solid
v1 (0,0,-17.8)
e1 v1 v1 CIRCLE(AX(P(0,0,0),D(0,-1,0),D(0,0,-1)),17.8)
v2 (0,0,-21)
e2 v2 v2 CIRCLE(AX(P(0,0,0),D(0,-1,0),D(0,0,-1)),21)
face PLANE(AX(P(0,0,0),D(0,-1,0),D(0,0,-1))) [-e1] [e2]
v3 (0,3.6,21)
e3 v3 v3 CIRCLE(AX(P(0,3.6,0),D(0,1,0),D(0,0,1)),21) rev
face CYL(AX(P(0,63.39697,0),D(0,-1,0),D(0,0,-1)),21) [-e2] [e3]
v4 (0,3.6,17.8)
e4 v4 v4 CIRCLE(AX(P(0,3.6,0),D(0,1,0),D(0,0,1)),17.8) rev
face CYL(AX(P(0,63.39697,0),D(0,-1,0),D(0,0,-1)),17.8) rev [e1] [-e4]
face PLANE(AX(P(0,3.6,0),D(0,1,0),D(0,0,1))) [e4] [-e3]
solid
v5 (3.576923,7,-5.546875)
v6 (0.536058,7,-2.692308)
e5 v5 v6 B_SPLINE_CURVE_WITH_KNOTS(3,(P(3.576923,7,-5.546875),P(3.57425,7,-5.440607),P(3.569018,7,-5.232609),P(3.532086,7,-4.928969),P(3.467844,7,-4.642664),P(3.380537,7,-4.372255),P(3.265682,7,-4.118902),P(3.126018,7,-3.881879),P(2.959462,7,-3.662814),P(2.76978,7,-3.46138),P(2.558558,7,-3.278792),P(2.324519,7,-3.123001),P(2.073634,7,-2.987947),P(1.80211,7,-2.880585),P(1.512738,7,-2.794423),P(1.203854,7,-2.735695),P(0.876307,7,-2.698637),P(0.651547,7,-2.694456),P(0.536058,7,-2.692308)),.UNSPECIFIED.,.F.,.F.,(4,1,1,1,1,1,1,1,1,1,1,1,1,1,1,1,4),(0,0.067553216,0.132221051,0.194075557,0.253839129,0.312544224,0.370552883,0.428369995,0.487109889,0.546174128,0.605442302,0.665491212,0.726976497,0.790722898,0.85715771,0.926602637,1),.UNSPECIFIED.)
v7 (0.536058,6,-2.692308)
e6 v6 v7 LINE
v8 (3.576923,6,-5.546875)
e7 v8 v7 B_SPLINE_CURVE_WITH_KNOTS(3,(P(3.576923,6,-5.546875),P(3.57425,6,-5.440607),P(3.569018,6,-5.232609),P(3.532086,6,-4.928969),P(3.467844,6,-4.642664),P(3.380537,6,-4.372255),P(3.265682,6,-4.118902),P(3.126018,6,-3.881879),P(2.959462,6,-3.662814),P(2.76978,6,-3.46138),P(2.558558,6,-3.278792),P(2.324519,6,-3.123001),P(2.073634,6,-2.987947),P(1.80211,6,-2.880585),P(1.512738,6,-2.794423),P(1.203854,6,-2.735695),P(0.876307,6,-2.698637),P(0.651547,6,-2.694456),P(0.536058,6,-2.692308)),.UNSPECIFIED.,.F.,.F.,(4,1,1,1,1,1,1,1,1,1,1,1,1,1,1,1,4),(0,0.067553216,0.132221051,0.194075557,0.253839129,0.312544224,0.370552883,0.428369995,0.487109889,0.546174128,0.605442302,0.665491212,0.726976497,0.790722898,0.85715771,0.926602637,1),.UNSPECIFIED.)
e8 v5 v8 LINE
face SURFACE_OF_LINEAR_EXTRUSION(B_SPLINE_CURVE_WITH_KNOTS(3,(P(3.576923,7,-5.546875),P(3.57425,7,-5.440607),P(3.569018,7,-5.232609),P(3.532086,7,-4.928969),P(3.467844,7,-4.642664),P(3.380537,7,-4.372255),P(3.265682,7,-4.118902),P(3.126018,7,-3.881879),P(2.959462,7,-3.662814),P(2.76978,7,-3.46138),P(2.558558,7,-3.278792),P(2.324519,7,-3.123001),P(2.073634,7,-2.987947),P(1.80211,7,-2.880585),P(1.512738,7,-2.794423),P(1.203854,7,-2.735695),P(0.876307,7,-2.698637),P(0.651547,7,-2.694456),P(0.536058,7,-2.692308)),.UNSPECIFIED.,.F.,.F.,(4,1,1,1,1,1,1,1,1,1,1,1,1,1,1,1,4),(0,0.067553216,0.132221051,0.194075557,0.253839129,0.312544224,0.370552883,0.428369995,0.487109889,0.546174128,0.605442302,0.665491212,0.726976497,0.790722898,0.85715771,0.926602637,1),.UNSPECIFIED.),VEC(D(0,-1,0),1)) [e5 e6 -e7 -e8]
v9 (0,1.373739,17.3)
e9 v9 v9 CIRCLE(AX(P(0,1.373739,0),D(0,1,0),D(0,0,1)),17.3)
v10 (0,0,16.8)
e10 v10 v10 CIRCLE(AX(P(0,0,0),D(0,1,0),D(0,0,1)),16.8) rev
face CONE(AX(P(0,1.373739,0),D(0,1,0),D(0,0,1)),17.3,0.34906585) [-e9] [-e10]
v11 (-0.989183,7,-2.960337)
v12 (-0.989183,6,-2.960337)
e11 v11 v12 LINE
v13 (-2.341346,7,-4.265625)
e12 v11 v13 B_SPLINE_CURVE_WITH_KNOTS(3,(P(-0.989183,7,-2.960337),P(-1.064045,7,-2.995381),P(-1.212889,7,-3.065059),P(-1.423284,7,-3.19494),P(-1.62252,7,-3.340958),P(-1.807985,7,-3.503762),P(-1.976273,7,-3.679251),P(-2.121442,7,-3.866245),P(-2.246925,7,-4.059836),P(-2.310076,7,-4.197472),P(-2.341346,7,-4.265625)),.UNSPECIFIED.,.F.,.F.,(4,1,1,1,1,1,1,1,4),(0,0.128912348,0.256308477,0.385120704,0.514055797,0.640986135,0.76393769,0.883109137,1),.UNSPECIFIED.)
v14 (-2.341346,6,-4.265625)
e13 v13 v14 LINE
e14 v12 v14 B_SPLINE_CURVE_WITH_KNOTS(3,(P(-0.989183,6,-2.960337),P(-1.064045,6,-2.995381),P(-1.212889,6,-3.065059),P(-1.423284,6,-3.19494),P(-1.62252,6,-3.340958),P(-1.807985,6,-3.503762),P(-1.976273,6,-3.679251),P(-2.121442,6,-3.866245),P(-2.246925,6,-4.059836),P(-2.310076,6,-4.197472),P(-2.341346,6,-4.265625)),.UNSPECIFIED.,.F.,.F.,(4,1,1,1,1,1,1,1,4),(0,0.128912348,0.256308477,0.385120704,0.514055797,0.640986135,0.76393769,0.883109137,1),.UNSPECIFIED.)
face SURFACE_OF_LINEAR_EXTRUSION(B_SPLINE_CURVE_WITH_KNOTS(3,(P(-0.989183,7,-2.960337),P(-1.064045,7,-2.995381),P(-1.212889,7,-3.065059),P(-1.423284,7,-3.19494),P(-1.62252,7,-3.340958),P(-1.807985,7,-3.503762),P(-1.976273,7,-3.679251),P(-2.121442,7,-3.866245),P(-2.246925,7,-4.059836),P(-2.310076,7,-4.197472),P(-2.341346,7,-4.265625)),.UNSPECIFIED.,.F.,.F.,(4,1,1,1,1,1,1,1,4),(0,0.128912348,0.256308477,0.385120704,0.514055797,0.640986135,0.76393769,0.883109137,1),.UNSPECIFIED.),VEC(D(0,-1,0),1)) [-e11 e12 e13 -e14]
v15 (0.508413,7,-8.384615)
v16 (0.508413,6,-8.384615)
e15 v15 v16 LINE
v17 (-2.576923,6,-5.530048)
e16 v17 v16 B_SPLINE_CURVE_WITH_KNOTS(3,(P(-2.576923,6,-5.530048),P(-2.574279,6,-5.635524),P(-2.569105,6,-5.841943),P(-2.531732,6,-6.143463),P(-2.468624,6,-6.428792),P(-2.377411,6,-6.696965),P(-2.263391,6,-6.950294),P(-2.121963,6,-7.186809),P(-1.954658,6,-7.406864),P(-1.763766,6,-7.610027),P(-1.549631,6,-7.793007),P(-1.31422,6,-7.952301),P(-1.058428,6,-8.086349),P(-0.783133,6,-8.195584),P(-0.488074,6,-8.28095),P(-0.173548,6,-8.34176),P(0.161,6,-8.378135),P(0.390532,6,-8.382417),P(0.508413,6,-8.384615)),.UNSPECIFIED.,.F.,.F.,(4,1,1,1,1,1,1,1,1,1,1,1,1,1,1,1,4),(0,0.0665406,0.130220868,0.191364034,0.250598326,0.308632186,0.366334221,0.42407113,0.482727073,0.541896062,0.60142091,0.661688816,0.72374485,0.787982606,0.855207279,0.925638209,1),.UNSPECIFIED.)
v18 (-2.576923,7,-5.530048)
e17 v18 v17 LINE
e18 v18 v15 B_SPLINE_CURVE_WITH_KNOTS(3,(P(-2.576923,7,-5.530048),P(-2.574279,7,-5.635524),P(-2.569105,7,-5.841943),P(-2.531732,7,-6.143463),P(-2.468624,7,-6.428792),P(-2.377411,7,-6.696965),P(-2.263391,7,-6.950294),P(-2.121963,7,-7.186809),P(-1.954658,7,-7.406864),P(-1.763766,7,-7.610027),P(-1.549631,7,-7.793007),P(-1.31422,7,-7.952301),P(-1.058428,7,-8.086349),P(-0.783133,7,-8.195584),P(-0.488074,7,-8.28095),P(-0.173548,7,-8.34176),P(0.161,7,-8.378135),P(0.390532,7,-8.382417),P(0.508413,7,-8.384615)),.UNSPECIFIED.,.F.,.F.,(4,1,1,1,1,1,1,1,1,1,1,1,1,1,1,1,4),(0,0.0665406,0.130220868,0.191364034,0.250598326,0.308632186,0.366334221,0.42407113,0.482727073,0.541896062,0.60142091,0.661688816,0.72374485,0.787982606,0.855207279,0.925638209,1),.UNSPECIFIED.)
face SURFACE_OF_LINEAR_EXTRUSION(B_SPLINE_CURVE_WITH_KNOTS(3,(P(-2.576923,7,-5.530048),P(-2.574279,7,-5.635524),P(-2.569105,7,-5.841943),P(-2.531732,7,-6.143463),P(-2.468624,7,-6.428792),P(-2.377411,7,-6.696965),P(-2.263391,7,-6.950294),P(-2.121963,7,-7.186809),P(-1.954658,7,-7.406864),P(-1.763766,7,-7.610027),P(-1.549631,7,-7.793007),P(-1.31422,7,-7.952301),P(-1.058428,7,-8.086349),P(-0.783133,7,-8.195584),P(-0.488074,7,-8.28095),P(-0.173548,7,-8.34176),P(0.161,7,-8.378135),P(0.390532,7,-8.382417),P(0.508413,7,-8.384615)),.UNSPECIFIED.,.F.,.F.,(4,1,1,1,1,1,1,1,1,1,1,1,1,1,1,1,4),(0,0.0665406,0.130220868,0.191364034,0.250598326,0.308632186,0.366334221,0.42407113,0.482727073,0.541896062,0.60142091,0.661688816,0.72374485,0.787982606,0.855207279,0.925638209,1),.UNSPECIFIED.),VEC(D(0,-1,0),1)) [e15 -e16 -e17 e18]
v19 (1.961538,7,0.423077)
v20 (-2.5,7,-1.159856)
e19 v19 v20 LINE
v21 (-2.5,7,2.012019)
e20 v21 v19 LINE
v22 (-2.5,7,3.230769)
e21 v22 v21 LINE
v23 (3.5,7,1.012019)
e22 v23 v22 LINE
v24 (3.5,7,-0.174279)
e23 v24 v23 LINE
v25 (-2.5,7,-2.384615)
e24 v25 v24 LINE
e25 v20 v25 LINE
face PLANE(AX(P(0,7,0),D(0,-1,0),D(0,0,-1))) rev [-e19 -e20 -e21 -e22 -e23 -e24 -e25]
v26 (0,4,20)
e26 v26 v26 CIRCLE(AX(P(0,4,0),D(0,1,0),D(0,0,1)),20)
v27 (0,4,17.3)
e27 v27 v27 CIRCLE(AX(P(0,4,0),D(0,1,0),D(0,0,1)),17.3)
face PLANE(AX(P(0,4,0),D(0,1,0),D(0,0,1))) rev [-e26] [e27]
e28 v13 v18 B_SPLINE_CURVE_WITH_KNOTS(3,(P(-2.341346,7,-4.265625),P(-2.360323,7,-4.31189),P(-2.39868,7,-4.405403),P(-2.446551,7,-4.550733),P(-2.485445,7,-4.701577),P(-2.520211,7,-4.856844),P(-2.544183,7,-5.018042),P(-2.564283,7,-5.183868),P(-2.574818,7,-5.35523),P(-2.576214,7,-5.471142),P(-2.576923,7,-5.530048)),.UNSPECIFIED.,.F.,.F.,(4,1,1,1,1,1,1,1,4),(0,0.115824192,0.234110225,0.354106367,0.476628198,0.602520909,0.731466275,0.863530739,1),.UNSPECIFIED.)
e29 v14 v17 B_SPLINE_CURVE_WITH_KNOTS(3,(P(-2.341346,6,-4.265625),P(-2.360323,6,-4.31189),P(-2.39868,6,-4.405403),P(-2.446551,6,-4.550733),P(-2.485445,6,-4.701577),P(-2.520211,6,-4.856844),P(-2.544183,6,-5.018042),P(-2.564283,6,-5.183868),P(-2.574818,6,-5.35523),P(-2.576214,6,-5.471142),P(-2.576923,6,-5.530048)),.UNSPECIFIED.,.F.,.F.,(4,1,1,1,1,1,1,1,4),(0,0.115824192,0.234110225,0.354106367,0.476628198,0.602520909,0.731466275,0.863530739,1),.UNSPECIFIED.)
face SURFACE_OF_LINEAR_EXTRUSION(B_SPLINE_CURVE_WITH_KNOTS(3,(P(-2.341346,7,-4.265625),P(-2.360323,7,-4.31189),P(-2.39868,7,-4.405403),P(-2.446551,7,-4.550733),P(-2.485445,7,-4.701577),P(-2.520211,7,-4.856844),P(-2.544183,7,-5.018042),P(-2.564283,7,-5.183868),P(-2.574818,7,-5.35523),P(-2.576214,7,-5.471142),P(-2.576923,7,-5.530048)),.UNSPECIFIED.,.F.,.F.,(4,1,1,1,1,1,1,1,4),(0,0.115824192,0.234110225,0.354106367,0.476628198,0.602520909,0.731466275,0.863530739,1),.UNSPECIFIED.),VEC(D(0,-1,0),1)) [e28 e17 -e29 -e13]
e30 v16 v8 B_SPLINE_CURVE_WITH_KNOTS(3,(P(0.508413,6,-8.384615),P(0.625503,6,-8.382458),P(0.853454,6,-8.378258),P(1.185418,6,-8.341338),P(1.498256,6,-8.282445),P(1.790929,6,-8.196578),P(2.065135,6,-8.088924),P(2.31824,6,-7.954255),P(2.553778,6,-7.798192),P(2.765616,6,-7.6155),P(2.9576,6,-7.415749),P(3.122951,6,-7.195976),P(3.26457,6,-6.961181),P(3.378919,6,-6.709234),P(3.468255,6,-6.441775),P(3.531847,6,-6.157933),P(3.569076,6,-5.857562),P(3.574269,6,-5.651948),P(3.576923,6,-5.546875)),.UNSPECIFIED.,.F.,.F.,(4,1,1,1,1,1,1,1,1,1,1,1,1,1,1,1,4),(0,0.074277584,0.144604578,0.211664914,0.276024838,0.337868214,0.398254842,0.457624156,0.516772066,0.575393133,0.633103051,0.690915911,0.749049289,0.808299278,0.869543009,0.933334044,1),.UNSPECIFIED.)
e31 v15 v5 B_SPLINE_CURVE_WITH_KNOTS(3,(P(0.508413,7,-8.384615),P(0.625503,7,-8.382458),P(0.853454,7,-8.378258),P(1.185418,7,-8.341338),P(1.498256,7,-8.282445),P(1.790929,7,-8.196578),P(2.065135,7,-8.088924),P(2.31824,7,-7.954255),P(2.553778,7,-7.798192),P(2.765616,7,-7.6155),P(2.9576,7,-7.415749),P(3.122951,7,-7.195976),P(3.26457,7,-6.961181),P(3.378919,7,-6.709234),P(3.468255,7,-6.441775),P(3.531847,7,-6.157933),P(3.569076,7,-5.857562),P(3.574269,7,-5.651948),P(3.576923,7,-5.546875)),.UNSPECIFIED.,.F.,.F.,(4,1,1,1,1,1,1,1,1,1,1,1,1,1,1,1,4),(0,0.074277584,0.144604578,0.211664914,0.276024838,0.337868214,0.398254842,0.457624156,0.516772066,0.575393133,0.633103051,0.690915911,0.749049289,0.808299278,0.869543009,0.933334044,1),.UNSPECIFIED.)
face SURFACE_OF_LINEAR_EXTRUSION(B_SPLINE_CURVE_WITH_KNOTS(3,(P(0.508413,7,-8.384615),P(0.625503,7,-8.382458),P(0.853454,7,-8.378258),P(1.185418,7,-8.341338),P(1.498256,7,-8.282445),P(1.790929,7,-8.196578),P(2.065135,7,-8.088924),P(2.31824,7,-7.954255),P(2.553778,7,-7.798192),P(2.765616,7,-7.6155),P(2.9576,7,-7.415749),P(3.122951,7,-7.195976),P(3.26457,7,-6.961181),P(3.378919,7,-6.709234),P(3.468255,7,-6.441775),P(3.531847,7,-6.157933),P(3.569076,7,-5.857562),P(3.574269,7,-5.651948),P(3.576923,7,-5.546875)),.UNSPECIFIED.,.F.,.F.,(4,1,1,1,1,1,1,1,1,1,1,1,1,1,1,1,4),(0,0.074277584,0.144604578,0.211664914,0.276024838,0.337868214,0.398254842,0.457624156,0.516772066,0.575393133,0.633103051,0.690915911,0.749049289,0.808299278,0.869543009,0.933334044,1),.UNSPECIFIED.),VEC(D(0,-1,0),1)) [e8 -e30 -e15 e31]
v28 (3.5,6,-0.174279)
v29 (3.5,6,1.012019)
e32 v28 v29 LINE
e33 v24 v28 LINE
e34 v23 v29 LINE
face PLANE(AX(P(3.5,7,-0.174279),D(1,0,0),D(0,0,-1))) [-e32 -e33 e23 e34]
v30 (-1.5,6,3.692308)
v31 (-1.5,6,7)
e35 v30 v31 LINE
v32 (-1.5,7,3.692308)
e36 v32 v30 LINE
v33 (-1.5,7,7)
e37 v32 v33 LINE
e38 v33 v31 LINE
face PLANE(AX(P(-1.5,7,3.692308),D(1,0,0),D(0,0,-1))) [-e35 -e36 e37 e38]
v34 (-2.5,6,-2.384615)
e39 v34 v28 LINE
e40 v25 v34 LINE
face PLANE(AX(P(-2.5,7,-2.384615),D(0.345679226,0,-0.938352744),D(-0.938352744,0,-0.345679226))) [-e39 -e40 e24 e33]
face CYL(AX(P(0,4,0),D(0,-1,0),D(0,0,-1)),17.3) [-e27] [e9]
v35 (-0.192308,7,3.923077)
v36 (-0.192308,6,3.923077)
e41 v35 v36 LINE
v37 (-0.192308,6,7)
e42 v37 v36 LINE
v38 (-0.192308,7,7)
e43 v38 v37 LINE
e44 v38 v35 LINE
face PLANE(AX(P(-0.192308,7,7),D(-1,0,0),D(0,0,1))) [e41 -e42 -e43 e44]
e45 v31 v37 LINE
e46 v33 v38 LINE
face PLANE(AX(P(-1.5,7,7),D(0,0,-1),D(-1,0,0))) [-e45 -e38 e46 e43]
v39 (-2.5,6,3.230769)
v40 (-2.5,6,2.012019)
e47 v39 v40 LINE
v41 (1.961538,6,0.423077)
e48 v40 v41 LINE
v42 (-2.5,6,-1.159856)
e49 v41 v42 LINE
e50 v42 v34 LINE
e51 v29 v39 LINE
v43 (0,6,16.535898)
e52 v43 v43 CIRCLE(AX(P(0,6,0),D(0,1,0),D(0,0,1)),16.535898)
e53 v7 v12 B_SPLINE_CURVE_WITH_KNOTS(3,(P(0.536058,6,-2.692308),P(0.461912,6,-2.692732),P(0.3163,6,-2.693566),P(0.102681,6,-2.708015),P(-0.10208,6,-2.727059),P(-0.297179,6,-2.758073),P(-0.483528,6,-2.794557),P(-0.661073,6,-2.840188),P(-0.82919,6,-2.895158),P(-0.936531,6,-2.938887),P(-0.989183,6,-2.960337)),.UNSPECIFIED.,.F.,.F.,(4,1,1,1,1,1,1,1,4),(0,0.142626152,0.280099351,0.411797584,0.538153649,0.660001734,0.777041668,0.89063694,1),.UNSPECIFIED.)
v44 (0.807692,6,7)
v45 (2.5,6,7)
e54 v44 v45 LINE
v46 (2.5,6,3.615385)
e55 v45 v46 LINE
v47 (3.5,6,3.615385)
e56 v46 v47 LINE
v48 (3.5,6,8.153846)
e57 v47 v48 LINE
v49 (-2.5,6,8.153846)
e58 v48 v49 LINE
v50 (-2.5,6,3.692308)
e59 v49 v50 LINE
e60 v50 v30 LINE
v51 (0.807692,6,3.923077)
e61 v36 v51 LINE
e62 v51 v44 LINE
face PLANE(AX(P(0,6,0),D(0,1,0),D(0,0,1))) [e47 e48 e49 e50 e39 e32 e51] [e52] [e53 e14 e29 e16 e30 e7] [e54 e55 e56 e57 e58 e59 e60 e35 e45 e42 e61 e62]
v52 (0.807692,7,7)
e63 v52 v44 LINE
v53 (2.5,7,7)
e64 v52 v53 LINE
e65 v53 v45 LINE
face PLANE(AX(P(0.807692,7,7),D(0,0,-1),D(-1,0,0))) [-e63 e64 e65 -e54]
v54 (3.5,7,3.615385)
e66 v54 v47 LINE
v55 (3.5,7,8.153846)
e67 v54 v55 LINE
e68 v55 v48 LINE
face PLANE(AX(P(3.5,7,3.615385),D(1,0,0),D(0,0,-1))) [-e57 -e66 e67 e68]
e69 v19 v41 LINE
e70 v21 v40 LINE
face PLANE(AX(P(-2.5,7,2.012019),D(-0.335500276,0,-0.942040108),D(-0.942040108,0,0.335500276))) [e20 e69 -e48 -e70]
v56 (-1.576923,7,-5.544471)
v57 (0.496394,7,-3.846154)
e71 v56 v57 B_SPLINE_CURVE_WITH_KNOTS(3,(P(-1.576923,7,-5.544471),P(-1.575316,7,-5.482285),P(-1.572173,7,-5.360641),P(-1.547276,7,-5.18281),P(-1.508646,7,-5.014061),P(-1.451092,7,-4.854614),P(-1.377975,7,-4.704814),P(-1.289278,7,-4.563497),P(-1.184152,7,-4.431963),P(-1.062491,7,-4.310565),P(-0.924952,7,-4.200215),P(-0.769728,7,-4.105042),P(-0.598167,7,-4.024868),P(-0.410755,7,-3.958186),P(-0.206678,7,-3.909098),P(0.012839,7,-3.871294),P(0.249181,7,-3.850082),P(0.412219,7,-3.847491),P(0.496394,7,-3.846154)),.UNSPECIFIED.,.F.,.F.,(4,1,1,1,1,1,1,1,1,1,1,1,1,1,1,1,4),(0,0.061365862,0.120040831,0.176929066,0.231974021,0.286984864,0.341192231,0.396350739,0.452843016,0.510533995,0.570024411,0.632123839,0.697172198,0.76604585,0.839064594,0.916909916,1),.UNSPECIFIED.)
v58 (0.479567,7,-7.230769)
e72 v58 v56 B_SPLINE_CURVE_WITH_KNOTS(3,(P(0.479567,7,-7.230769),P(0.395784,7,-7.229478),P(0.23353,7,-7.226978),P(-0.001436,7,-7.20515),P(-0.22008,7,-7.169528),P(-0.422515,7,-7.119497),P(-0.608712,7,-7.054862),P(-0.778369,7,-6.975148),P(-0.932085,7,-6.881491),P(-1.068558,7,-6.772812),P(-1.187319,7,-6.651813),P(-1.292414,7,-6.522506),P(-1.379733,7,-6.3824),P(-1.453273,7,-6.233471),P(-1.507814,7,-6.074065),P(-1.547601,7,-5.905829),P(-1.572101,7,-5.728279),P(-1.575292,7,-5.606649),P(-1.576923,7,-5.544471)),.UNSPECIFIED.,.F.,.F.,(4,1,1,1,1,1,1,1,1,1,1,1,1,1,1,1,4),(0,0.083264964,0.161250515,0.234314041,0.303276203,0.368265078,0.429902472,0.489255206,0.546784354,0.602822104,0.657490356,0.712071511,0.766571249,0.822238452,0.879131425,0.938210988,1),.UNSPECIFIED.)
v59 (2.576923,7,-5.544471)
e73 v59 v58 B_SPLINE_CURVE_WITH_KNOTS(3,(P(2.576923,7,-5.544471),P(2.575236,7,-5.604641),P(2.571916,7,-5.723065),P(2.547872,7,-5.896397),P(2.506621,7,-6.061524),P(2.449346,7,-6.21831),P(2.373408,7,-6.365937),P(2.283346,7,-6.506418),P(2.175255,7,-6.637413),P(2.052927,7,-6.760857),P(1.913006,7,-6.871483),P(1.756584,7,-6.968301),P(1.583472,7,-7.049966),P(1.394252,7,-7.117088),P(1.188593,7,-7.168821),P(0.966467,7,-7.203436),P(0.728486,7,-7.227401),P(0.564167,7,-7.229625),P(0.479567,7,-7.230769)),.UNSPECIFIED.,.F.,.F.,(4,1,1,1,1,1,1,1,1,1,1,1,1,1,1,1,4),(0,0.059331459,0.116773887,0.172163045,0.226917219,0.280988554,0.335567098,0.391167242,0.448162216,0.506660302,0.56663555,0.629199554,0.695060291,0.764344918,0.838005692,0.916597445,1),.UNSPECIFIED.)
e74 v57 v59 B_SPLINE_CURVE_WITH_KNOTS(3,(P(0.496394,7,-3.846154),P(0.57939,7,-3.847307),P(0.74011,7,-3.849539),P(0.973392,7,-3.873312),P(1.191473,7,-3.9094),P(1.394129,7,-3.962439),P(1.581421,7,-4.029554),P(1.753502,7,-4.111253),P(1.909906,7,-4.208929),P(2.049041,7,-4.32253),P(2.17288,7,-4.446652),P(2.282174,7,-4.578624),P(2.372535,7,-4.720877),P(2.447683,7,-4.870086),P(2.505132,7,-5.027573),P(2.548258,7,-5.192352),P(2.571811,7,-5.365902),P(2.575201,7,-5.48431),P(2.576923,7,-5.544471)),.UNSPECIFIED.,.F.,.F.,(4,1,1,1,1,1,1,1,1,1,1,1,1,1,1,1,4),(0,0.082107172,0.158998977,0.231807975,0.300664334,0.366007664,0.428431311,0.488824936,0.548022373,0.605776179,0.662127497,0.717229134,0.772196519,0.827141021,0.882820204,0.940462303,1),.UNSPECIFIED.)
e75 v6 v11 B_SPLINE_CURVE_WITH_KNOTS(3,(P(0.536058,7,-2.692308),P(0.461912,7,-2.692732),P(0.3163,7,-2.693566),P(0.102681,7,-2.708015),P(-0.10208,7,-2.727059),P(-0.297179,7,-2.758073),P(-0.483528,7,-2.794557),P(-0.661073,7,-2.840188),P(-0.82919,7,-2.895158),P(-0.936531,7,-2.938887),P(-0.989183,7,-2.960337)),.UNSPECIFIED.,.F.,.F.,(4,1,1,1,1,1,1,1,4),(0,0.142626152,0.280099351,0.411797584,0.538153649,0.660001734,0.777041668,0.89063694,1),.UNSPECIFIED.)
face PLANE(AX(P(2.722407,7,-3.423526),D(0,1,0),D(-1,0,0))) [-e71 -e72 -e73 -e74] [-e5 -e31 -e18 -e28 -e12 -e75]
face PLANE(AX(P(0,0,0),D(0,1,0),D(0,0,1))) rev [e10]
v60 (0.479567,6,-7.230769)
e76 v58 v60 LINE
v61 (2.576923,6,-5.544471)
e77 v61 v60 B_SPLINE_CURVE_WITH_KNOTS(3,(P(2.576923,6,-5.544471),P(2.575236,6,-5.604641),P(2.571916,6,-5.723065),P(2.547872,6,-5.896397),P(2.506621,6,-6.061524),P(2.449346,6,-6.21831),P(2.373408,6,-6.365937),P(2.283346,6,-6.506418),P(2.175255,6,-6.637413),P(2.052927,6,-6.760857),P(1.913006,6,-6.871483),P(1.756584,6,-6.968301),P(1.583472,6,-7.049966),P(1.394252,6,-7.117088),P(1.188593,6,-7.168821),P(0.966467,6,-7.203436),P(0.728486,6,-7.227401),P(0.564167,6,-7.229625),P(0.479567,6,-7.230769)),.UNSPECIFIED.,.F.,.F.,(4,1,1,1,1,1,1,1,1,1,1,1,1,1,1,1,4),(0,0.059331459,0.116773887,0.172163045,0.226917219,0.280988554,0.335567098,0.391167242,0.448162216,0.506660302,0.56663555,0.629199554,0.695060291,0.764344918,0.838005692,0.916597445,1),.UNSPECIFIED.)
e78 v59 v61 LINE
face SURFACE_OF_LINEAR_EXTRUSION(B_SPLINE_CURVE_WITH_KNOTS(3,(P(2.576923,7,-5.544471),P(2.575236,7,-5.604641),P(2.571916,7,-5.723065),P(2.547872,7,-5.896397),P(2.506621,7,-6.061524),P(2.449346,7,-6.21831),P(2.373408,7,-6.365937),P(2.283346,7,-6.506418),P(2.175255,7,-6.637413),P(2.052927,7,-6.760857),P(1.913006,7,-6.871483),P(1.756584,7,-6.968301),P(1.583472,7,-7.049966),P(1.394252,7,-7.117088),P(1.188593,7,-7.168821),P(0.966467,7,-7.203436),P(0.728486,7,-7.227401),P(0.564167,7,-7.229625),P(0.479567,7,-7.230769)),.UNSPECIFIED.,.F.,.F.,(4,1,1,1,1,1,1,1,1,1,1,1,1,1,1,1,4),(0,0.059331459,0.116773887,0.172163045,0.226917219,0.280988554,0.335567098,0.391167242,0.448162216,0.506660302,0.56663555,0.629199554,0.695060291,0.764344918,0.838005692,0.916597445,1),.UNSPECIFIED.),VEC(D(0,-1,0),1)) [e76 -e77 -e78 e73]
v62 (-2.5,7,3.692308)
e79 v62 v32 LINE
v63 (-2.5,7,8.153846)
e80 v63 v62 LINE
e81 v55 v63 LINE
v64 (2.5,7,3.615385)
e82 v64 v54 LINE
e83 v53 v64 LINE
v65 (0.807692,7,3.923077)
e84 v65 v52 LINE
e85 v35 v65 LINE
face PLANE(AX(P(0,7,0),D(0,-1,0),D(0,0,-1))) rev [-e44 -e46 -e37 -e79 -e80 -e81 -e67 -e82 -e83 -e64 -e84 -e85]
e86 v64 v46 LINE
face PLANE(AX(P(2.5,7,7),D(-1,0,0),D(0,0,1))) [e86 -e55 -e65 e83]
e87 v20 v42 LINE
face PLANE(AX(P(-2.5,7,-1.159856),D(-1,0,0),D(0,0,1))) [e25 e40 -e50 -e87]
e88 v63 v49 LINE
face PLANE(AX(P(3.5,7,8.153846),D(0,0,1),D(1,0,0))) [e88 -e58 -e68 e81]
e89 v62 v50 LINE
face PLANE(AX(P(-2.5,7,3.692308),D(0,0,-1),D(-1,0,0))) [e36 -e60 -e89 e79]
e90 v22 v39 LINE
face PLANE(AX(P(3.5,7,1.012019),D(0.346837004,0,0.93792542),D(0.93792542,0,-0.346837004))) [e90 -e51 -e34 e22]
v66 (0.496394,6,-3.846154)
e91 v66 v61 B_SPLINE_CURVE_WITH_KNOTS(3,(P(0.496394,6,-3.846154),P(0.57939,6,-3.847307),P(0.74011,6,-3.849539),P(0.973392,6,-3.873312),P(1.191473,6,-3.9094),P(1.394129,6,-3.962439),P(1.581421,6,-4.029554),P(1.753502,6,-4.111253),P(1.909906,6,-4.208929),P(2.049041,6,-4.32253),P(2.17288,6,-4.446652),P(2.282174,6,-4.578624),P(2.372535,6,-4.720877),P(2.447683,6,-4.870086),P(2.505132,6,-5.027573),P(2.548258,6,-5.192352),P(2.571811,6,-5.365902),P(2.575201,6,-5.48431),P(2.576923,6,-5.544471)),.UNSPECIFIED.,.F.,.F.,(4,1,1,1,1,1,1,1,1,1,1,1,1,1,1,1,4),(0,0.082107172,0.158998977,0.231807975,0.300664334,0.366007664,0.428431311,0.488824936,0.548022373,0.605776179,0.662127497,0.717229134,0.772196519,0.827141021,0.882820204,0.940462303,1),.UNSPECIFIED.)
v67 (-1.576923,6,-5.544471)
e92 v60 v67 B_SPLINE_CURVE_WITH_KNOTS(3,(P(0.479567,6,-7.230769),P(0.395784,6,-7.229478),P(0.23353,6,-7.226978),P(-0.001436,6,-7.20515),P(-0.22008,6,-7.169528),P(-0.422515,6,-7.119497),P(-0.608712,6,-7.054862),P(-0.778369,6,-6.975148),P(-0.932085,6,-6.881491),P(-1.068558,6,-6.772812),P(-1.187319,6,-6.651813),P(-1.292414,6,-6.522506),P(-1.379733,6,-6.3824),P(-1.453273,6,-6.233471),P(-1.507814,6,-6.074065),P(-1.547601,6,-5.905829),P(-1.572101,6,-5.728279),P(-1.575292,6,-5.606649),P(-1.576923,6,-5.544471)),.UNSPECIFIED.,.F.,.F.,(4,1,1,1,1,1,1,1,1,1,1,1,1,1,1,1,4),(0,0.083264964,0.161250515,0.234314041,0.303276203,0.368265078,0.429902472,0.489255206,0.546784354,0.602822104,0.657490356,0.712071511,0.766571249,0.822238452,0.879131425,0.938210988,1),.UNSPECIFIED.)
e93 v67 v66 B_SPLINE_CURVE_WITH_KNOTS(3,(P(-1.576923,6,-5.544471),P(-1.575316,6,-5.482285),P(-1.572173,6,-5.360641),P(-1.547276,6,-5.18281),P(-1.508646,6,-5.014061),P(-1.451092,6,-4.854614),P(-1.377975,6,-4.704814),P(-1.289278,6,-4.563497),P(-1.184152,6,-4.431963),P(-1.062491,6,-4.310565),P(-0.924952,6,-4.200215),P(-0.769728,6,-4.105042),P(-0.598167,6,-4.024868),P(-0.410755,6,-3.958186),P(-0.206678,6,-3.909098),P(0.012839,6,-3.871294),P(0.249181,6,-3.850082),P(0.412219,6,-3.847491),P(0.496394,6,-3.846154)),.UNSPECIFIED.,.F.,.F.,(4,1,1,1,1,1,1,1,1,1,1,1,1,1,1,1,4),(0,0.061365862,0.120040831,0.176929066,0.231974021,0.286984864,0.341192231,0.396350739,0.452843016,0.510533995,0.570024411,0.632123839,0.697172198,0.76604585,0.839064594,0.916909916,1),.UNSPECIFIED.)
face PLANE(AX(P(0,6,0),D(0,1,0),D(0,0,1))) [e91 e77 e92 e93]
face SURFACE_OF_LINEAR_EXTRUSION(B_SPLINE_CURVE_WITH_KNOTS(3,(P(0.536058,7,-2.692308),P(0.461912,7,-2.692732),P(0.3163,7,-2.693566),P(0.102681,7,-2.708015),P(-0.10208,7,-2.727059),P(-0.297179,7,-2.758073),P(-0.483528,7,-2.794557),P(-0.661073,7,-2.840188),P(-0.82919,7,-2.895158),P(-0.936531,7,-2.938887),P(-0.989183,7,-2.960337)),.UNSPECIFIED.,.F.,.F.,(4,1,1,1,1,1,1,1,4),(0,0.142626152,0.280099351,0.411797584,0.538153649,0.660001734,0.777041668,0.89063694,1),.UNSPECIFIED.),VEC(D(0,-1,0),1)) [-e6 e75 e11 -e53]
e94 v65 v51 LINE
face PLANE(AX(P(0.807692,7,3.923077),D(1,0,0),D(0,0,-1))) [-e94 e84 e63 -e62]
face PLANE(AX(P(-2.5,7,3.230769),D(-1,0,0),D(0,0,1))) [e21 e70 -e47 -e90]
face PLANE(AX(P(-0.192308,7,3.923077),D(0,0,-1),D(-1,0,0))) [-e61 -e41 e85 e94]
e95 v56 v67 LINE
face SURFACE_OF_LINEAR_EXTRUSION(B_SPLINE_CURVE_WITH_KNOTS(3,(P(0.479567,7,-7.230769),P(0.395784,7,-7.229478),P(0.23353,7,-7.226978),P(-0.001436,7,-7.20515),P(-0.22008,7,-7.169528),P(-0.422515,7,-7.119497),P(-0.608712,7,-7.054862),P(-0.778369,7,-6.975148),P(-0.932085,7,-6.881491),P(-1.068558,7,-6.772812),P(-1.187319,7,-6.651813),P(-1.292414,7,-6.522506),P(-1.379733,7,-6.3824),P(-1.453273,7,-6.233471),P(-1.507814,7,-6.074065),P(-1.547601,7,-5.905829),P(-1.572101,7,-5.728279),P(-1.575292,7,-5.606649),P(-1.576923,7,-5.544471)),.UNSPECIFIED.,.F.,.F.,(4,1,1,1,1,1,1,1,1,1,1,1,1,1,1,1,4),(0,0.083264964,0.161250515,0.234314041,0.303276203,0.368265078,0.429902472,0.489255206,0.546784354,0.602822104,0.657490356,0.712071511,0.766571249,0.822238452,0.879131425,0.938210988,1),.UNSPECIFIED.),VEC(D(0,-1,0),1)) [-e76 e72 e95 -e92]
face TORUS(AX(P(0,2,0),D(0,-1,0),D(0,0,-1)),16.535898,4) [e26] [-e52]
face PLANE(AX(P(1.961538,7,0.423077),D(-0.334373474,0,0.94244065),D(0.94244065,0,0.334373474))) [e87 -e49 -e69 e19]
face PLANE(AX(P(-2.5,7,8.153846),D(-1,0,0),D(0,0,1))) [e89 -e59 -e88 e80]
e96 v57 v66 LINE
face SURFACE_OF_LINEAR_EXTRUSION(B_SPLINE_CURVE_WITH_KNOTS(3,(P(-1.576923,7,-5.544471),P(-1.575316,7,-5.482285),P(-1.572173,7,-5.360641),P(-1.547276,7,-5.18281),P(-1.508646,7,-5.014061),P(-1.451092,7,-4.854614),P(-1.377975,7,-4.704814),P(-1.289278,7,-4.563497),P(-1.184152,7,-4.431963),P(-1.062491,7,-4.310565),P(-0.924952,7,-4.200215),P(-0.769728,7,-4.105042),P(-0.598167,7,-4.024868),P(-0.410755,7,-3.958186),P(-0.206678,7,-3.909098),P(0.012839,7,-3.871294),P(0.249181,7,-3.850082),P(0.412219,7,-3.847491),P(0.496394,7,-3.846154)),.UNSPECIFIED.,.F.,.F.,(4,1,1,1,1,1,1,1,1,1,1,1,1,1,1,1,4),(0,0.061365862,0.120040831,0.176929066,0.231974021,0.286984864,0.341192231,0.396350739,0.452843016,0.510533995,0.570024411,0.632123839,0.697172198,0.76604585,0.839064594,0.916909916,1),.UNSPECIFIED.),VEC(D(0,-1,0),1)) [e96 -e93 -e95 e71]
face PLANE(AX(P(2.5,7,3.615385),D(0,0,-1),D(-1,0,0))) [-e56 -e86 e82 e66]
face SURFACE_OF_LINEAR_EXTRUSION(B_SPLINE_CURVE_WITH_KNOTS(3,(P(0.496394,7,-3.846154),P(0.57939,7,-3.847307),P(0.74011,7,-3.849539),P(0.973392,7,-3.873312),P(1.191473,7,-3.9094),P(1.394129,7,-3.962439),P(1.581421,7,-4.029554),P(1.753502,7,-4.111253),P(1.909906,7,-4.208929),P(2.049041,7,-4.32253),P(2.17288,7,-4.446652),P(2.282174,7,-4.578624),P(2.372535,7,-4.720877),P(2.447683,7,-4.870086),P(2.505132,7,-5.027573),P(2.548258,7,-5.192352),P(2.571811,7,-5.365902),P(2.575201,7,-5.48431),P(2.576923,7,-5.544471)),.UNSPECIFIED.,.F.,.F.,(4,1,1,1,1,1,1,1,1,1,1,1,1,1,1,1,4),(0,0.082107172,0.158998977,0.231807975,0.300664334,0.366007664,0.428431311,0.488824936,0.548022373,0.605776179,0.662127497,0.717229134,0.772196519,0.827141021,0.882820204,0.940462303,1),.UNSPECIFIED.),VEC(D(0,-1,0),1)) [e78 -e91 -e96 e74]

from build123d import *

# Parameters (mm, degrees)
SKETCH1_R           = 17.3
BOSS_EXTRUDE1_DEPTH = 4
SKETCH2_R           = 20
BOSS_EXTRUDE2_DEPTH = 2
CHAMFER1_SIZE       = 0.5
CHAMFER1_SIZE2      = 1.37373871
BOSS_EXTRUDE3_DEPTH = 1
SKETCH4_R           = 21
SKETCH4_R_2         = 17.8
BOSS_EXTRUDE4_DEPTH = 3.6
FILLET1_R           = 4


with BuildPart() as part:
    # Sketch1 → Boss-Extrude1 (new body)
    with BuildSketch(Plane(origin=(0, 0, 0), x_dir=(1, 0, 0), z_dir=(0, 1, 0))):
        with Locations(Location((0, 0, 0), (0, 0, 270))):
            Circle(SKETCH1_R)
    extrude(amount=BOSS_EXTRUDE1_DEPTH)

    # Sketch2 → Boss-Extrude2 (add)
    with BuildSketch(Plane(origin=(0, 4, 0), x_dir=(1, 0, 0), z_dir=(0, 1, 0))):
        with Locations(Location((0, 0, 0), (0, 0, 270))):
            Circle(SKETCH2_R)
    extrude(amount=BOSS_EXTRUDE2_DEPTH)

    # Chamfer1
    chamfer1_edges = [part.edges().sort_by_distance(p)[0] for p in [
        (0, 0, -17.3),
    ]]
    chamfer1_side = [part.faces().sort_by_distance(p)[0] for p in [
        (0, 0, 0),
    ]]
    chamfer(chamfer1_edges, length=CHAMFER1_SIZE, length2=CHAMFER1_SIZE2, reference=chamfer1_side[0])

    # Sketch3 → Boss-Extrude3 (add)
    # profile 1 of 3: a face of its own
    with BuildSketch(Plane(origin=(0, 6, 0), x_dir=(1, 0, 0), z_dir=(0, 1, 0))):
        Polygon((3.5, -8.153846154), (-2.5, -8.153846154), (-2.5, -3.692307692), (-1.5, -3.692307692), (-1.5, -7), (-0.192307692, -7), (-0.192307692, -3.923076923), (0.807692308, -3.923076923), (0.807692308, -7), (2.5, -7), (2.5, -3.615384615), (3.5, -3.615384615), align=None)
    # profile 2 of 3: a face of its own
    with BuildSketch(Plane(origin=(0, 6, 0), x_dir=(1, 0, 0), z_dir=(0, 1, 0))):
        Polygon((3.5, -1.012019231), (-2.5, -3.230769231), (-2.5, -2.012019231), (1.961538462, -0.423076923), (-2.5, 1.159855769), (-2.5, 2.384615385), (3.5, 0.174278846), align=None)
    # profile 3 of 3: a face of its own
    with BuildSketch(Plane(origin=(0, 6, 0), x_dir=(1, 0, 0), z_dir=(0, 1, 0))):
        with BuildLine():
            add(Edge.make_bspline(
                [(0.536057692, 2.692307692), (0.461912169, 2.692732288), (0.316299931, 2.693566139), (0.102681311, 2.708014837), (-0.102080111, 2.727059346), (-0.297178935, 2.7580733), (-0.48352829, 2.794557032), (-0.66107286, 2.840188498), (-0.829190002, 2.895158255), (-0.936530981, 2.938887132), (-0.989182692, 2.960336538)],
                knots=[0, 0, 0, 0, 1.141009212, 2.240794809, 3.294380675, 4.305229195, 5.280013876, 6.216333343, 7.125095522, 8, 8, 8, 8], degree=3))
            add(Edge.make_bspline(
                [(-0.989182692, 2.960336538), (-1.064045062, 2.995381495), (-1.212889297, 3.065059221), (-1.423284081, 3.194940159), (-1.622520045, 3.340957789), (-1.807985373, 3.503762135), (-1.976273284, 3.679250682), (-2.121442274, 3.8662452), (-2.246924651, 4.059835868), (-2.310075686, 4.197471854), (-2.341346154, 4.265625)],
                knots=[0, 0, 0, 0, 1.031298788, 2.050467816, 3.080965632, 4.112446372, 5.127889083, 6.11150152, 7.064873096, 8, 8, 8, 8], degree=3))
            add(Edge.make_bspline(
                [(-2.341346154, 4.265625), (-2.36032292, 4.311889746), (-2.398679804, 4.405402593), (-2.446551204, 4.550732565), (-2.485444553, 4.701576766), (-2.520210675, 4.856844152), (-2.54418306, 5.018042238), (-2.564283081, 5.183868476), (-2.574817852, 5.355230377), (-2.576213703, 5.47114174), (-2.576923077, 5.530048077)],
                knots=[0, 0, 0, 0, 0.92659354, 1.872881803, 2.832850937, 3.813025581, 4.820167273, 5.851730198, 6.908245912, 8, 8, 8, 8], degree=3))
            add(Edge.make_bspline(
                [(-2.576923077, 5.530048077), (-2.574279131, 5.635524435), (-2.569104893, 5.841943116), (-2.531731982, 6.143462843), (-2.468624386, 6.428792059), (-2.377410507, 6.69696489), (-2.263391215, 6.950293554), (-2.121963134, 7.186809415), (-1.954657548, 7.4068641), (-1.763766491, 7.61002662), (-1.54963122, 7.793006532), (-1.314219689, 7.95230111), (-1.058428096, 8.08634923), (-0.783133069, 8.195583929), (-0.488073589, 8.280950362), (-0.173547671, 8.341759709), (0.160999915, 8.378135477), (0.390531821, 8.382416673), (0.508413462, 8.384615385)],
                knots=[0, 0, 0, 0, 1.064649597, 2.083533894, 3.06182455, 4.009573214, 4.938114978, 5.86134754, 6.785138072, 7.723633163, 8.670337, 9.622734556, 10.587021061, 11.579917593, 12.607721694, 13.68331646, 14.81021135, 16, 16, 16, 16], degree=3))
            add(Edge.make_bspline(
                [(0.508413462, 8.384615385), (0.625502693, 8.382457893), (0.853453552, 8.378257659), (1.185418087, 8.341337664), (1.498255599, 8.282445298), (1.790928875, 8.196577649), (2.065135144, 8.088924118), (2.31824048, 7.954255311), (2.553777896, 7.798191605), (2.765616292, 7.615499739), (2.957600047, 7.415749174), (3.122950989, 7.195975576), (3.264570499, 6.961180913), (3.378919342, 6.709233585), (3.468254689, 6.441775319), (3.531847225, 6.157933395), (3.569076319, 5.857562209), (3.574269344, 5.651947799), (3.576923077, 5.546875)],
                knots=[0, 0, 0, 0, 1.188441339, 2.313673251, 3.386638619, 4.416397407, 5.405891428, 6.372077474, 7.321986495, 8.268353052, 9.206290124, 10.129648818, 11.054654577, 11.984788619, 12.932788448, 13.912688147, 14.933344701, 16, 16, 16, 16], degree=3))
            add(Edge.make_bspline(
                [(3.576923077, 5.546875), (3.574250081, 5.440606648), (3.56901826, 5.232608955), (3.532086394, 4.928968883), (3.467844147, 4.642664358), (3.380536597, 4.372254659), (3.265682212, 4.118902272), (3.126018439, 3.881878952), (2.959462483, 3.662813738), (2.769780203, 3.461379628), (2.558558225, 3.27879165), (2.324518577, 3.123001073), (2.073634225, 2.987947467), (1.802109992, 2.880585343), (1.512738113, 2.79442276), (1.20385391, 2.735695183), (0.876307406, 2.698636721), (0.651547296, 2.694455929), (0.536057692, 2.692307692)],
                knots=[0, 0, 0, 0, 1.080851458, 2.115536814, 3.105208919, 4.06142606, 5.000707585, 5.928846123, 6.853919921, 7.79375822, 8.738786042, 9.687076824, 10.64785939, 11.631623957, 12.651566366, 13.714523363, 14.825642194, 16, 16, 16, 16], degree=3))
        make_face()
        with BuildLine():
            add(Edge.make_bspline(
                [(0.496394231, 3.846153846), (0.579389989, 3.847306669), (0.740109696, 3.849539087), (0.973391986, 3.873312358), (1.191472619, 3.909400041), (1.394129342, 3.962438602), (1.581421488, 4.029554109), (1.753502267, 4.111253032), (1.909905592, 4.20892881), (2.049040642, 4.322529511), (2.172879925, 4.4466519), (2.282174308, 4.578623761), (2.372534629, 4.720877366), (2.447682974, 4.870085953), (2.50513219, 5.02757294), (2.548258299, 5.192351574), (2.571811156, 5.365902285), (2.575200825, 5.484309712), (2.576923077, 5.544471154)],
                knots=[0, 0, 0, 0, 1.313714757, 2.543983635, 3.708927593, 4.810629344, 5.856122632, 6.85490097, 7.821198974, 8.76835797, 9.692418868, 10.594039946, 11.475666139, 12.355144307, 13.23425633, 14.12512326, 15.047396847, 16, 16, 16, 16], degree=3))
            add(Edge.make_bspline(
                [(2.576923077, 5.544471154), (2.575236293, 5.604641115), (2.571916431, 5.723065308), (2.547872097, 5.896396901), (2.506620801, 6.061523779), (2.449345655, 6.21830978), (2.37340808, 6.365936861), (2.283346485, 6.50641813), (2.175254899, 6.637412989), (2.0529265, 6.760856514), (1.913005947, 6.871483063), (1.756584116, 6.96830124), (1.583471675, 7.049966229), (1.394252357, 7.117087633), (1.188592806, 7.168820628), (0.966466826, 7.203435724), (0.728485546, 7.227401244), (0.564166666, 7.22962456), (0.479567308, 7.230769231)],
                knots=[0, 0, 0, 0, 0.949303347, 1.86838219, 2.75460872, 3.63067551, 4.495816858, 5.369073575, 6.258675874, 7.17059545, 8.106564835, 9.066168793, 10.067192861, 11.120964654, 12.229518689, 13.408091079, 14.665559114, 16, 16, 16, 16], degree=3))
            add(Edge.make_bspline(
                [(0.479567308, 7.230769231), (0.395783975, 7.229478346), (0.233529589, 7.226978424), (-0.00143621, 7.205149769), (-0.220079654, 7.169527516), (-0.422514597, 7.119497213), (-0.608712267, 7.054862228), (-0.77836884, 6.975148016), (-0.932085204, 6.881490733), (-1.068558354, 6.772812379), (-1.18731946, 6.651813065), (-1.292414499, 6.522505793), (-1.379732754, 6.382400276), (-1.453273108, 6.233471369), (-1.507814258, 6.074064924), (-1.547601053, 5.905828868), (-1.572100606, 5.728279375), (-1.575291742, 5.6066494), (-1.576923077, 5.544471154)],
                knots=[0, 0, 0, 0, 1.332239421, 2.580008232, 3.749024652, 4.852419255, 5.89224124, 6.878439556, 7.828083302, 8.748549668, 9.645153656, 10.519845698, 11.393144178, 12.26513999, 13.155815239, 14.066102797, 15.011375811, 16, 16, 16, 16], degree=3))
            add(Edge.make_bspline(
                [(-1.576923077, 5.544471154), (-1.575316276, 5.482285395), (-1.572173131, 5.360640724), (-1.547275797, 5.182809612), (-1.508646128, 5.014061126), (-1.451092454, 4.854614019), (-1.37797532, 4.704814324), (-1.289278248, 4.563496917), (-1.184152388, 4.431962749), (-1.062491387, 4.310564904), (-0.924951921, 4.200214761), (-0.769728259, 4.105041523), (-0.598166899, 4.024868471), (-0.410754627, 3.958185569), (-0.20667787, 3.909097891), (0.012838891, 3.871293652), (0.249181199, 3.850082068), (0.412218797, 3.847491396), (0.496394231, 3.846153846)],
                knots=[0, 0, 0, 0, 0.981853791, 1.920653289, 2.83086505, 3.71158433, 4.591757822, 5.459075689, 6.341611823, 7.24548826, 8.168543921, 9.120390574, 10.113981418, 11.154755163, 12.256733604, 13.425033512, 14.670558662, 16, 16, 16, 16], degree=3))
        make_face(mode=Mode.SUBTRACT)
    extrude(amount=BOSS_EXTRUDE3_DEPTH)

    # Fillet1
    # the kernel refuses this fillet: 4 mm, written as the material it takes off along each edge
    with BuildSketch(Plane(origin=(0, 6, 0), x_dir=(0, 0, 1), z_dir=(-1, 0, 0))) as fillet1_piece_1:
        with BuildLine():
            CenterArc((16.535898385, -4), FILLET1_R, 30, 60)
            Line((16.535898385, 0), (16.535898385, 0.08))
            Line((16.535898385, 0.08), (20, 0.08))
            Line((20, 0.08), (20.08, 0))
            ThreePointArc((20.08, 0), (20.08, -1), (20.069282032, -1.96))
            Line((20.069282032, -1.96), (20, -2))
        make_face()
    revolve(axis=Axis((0, 6, 0), (0, 1, 0)), mode=Mode.SUBTRACT)


with BuildPart() as body_2:
    # Sketch4 → Boss-Extrude4 (new body)
    with BuildSketch(Plane.XZ):
        with Locations(Location((0, 0, 0), (0, 0, 270))):
            Circle(SKETCH4_R)
        with Locations(Location((0, 0, 0), (0, 0, 270))):
            Circle(SKETCH4_R_2, mode=Mode.SUBTRACT)
    extrude(amount=-BOSS_EXTRUDE4_DEPTH)


solid = Compound([part.part, body_2.part])
